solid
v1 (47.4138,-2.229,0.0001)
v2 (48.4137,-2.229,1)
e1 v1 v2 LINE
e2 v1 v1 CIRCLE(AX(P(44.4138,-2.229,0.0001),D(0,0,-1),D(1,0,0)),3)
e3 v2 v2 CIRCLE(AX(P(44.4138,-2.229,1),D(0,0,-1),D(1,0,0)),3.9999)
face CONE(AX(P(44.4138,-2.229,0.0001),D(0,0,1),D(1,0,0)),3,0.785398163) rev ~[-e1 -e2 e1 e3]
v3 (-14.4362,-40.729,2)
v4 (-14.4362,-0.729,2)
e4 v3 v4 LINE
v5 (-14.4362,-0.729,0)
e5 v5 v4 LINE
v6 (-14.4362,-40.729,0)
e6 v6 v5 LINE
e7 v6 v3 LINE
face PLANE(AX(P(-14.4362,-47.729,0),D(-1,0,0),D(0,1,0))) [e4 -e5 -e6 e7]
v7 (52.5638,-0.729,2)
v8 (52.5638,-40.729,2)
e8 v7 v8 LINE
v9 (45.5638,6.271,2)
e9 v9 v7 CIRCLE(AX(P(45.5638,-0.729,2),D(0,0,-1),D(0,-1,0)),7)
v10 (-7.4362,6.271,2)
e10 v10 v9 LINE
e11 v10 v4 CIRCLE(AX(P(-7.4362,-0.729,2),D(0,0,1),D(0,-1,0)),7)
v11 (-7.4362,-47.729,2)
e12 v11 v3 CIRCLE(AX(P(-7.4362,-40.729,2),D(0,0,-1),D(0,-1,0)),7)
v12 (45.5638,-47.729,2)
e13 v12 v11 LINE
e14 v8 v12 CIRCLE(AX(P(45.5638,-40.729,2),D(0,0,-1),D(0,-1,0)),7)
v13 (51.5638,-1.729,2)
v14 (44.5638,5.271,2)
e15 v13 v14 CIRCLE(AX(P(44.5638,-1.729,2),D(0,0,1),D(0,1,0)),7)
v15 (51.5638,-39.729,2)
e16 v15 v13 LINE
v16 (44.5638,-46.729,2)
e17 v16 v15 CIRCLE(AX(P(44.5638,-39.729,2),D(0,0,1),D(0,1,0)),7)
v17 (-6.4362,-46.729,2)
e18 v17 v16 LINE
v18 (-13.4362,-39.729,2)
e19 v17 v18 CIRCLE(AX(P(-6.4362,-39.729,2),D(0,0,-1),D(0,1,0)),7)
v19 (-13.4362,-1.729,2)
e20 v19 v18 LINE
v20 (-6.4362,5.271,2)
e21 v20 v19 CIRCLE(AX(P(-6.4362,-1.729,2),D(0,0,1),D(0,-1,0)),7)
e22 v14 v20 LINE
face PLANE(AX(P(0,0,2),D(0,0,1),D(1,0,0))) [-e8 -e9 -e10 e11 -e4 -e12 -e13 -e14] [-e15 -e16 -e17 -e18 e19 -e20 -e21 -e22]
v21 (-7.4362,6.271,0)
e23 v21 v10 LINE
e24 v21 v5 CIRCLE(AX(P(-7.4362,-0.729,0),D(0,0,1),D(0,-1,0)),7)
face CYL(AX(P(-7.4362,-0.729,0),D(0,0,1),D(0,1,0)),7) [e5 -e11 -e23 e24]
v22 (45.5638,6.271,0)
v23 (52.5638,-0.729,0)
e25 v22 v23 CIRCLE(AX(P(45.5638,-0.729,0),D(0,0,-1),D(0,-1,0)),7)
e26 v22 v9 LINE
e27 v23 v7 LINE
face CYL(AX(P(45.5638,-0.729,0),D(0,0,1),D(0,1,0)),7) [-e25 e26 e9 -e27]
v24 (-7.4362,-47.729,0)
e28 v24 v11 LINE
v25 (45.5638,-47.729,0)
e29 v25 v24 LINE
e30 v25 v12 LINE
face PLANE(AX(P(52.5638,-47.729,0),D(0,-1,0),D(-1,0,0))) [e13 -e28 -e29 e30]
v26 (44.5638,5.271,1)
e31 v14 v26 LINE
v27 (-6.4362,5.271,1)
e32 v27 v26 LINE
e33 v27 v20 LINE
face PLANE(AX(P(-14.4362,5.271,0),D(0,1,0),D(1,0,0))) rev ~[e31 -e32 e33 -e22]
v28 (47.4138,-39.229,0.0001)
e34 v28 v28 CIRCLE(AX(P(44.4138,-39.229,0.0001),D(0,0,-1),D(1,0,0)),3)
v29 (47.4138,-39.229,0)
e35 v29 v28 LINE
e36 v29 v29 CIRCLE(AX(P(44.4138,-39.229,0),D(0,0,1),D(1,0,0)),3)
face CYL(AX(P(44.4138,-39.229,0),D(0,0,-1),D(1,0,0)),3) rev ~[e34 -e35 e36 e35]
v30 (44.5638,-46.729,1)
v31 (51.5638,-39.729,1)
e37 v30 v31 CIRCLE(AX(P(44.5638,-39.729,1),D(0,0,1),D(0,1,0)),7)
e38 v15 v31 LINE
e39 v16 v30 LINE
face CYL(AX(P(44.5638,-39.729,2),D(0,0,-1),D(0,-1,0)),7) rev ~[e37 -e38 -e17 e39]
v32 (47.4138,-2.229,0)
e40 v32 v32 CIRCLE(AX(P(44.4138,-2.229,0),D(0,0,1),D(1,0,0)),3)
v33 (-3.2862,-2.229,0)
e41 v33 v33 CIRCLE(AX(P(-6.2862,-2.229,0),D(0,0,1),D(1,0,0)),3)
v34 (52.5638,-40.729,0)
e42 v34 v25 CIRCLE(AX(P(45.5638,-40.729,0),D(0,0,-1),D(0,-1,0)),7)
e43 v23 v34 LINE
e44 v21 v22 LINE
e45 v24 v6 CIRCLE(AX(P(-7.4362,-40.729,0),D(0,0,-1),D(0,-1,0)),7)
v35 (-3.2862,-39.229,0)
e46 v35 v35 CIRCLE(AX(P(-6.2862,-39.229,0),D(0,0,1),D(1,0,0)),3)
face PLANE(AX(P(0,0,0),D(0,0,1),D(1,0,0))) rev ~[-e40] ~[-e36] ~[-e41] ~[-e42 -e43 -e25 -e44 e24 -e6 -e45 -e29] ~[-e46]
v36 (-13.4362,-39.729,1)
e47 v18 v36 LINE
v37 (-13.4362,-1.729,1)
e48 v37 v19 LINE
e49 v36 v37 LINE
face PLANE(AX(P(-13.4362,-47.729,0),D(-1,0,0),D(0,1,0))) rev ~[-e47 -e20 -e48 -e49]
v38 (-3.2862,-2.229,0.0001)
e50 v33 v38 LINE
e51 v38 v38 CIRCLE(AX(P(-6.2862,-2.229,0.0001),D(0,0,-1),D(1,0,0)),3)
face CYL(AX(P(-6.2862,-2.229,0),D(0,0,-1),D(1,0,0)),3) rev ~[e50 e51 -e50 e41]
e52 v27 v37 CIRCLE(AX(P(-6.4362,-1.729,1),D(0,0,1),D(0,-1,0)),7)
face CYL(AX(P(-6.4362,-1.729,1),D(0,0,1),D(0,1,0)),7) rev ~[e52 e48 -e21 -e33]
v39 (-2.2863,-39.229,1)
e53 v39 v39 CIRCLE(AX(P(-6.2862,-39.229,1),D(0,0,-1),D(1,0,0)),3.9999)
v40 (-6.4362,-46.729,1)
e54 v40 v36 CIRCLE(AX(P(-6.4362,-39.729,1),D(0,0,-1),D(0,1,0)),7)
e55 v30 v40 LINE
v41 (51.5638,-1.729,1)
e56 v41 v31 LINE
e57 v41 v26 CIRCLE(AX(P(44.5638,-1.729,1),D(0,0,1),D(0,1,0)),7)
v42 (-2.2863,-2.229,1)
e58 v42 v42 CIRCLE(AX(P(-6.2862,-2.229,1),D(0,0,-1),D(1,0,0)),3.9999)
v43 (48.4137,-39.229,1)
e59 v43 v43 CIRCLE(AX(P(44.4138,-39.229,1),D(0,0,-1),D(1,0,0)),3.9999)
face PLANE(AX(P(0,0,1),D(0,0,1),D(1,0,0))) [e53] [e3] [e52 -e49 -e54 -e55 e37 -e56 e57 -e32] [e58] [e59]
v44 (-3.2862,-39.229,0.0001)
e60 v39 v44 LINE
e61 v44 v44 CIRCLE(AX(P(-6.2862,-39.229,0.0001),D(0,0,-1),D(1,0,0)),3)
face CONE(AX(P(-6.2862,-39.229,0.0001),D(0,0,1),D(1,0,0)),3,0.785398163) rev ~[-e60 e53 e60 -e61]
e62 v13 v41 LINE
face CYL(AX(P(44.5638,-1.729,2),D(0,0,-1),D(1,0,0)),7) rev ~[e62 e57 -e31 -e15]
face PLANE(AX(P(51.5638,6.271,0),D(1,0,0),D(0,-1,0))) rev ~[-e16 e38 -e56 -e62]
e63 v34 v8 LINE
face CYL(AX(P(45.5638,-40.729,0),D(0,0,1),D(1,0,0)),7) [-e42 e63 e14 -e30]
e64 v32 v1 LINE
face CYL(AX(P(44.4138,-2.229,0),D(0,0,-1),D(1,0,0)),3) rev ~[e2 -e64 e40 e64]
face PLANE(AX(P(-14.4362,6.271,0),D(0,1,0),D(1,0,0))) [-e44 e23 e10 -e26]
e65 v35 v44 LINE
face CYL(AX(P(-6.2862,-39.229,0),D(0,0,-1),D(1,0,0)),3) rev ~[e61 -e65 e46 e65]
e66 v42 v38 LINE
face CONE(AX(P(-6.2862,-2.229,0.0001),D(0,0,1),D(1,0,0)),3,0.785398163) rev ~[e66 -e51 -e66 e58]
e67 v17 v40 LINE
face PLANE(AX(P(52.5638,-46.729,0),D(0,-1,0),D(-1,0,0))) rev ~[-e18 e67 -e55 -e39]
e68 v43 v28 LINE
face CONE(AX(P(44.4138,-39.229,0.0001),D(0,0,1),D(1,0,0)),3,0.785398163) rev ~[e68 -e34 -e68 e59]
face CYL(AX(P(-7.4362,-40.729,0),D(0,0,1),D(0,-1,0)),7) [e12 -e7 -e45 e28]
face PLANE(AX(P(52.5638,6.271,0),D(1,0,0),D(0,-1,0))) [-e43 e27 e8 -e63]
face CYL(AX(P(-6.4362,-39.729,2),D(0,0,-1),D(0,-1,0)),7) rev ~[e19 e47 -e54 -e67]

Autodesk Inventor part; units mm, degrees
ref_plane "YZ Plane" through (0, 0, 0) normal (1, 0, 0) x (0, 1, 0)
ref_plane "XZ Plane" through (0, 0, 0) normal (0, 1, 0) x (-1, 0, 0)
ref_plane "XY Plane" through (0, 0, 0) normal (0, 0, 1) x (1, 0, 0)
sketch "Esboço1" plane through (0, 0, 0) normal (0, 0, 1) x (1, 0, 0)
  line L0 (-14.4362, 6.271) -> (52.5638, 6.271)
  line L1 (52.5638, 6.271) -> (52.5638, -47.729)
  line L2 (52.5638, -47.729) -> (-14.4362, -47.729)
  line L3 (-14.4362, -47.729) -> (-14.4362, 6.271)
  circle A0 centre (-6.2862, -2.229) radius 3
  circle A1 centre (-6.2862, -39.229) radius 3
  circle A2 centre (44.4138, -39.229) radius 3
  circle A3 centre (44.4138, -2.229) radius 3
  point P0 (0, 0)
  dimension "d0" = 67
  dimension "d1" = 54
  dimension "d6" = 6
  dimension "d7" = 6
  dimension "d8" = 6
  dimension "d9" = 6
  dimension "d17" = 50.7
  dimension "d18" = 50.7
  dimension "d19" = 37
  dimension "d20" = 37
  dimension "d21" = 8.15
  dimension "d22" = 8.5
  dimension "d24" = 8.15
  dimension "d26" = 8.5
  dimension "d27" = 8.15
  dimension "d28" = 8.15
  dimension "d29" = 8.5
  dimension "d30" = 8.5
extrude "Extrusão1" add sketch "Esboço1" along normal blind 2
shell "Casca1" thickness 1 removed faces 5 at (11.3623, -15.2254, 2) at (-3.2959, -39.4704, 1.3333) at (-3.2959, -2.4704, 1.3333) at (47.4041, -2.4704, 1.3333) at (47.4041, -39.4704, 1.3333)
chamfer "Chanfro1" distance 1 angle 45 4 edges at (-9.2862, -39.229, 1) (-9.2862, -2.229, 1) (41.4138, -2.229, 1) (41.4138, -39.229, 1)
fillet "Arredondamento1" radius 7 8 edges at (-13.4362, 5.271, 1.5) (-14.4362, 6.271, 1) (52.5638, 6.271, 1) (51.5638, 5.271, 1.5) (51.5638, -46.729, 1.5) (52.5638, -47.729, 1) (-13.4362, -46.729, 1.5) (-14.4362, -47.729, 1)
properties part number "capa de alguma parte da guitarra"
